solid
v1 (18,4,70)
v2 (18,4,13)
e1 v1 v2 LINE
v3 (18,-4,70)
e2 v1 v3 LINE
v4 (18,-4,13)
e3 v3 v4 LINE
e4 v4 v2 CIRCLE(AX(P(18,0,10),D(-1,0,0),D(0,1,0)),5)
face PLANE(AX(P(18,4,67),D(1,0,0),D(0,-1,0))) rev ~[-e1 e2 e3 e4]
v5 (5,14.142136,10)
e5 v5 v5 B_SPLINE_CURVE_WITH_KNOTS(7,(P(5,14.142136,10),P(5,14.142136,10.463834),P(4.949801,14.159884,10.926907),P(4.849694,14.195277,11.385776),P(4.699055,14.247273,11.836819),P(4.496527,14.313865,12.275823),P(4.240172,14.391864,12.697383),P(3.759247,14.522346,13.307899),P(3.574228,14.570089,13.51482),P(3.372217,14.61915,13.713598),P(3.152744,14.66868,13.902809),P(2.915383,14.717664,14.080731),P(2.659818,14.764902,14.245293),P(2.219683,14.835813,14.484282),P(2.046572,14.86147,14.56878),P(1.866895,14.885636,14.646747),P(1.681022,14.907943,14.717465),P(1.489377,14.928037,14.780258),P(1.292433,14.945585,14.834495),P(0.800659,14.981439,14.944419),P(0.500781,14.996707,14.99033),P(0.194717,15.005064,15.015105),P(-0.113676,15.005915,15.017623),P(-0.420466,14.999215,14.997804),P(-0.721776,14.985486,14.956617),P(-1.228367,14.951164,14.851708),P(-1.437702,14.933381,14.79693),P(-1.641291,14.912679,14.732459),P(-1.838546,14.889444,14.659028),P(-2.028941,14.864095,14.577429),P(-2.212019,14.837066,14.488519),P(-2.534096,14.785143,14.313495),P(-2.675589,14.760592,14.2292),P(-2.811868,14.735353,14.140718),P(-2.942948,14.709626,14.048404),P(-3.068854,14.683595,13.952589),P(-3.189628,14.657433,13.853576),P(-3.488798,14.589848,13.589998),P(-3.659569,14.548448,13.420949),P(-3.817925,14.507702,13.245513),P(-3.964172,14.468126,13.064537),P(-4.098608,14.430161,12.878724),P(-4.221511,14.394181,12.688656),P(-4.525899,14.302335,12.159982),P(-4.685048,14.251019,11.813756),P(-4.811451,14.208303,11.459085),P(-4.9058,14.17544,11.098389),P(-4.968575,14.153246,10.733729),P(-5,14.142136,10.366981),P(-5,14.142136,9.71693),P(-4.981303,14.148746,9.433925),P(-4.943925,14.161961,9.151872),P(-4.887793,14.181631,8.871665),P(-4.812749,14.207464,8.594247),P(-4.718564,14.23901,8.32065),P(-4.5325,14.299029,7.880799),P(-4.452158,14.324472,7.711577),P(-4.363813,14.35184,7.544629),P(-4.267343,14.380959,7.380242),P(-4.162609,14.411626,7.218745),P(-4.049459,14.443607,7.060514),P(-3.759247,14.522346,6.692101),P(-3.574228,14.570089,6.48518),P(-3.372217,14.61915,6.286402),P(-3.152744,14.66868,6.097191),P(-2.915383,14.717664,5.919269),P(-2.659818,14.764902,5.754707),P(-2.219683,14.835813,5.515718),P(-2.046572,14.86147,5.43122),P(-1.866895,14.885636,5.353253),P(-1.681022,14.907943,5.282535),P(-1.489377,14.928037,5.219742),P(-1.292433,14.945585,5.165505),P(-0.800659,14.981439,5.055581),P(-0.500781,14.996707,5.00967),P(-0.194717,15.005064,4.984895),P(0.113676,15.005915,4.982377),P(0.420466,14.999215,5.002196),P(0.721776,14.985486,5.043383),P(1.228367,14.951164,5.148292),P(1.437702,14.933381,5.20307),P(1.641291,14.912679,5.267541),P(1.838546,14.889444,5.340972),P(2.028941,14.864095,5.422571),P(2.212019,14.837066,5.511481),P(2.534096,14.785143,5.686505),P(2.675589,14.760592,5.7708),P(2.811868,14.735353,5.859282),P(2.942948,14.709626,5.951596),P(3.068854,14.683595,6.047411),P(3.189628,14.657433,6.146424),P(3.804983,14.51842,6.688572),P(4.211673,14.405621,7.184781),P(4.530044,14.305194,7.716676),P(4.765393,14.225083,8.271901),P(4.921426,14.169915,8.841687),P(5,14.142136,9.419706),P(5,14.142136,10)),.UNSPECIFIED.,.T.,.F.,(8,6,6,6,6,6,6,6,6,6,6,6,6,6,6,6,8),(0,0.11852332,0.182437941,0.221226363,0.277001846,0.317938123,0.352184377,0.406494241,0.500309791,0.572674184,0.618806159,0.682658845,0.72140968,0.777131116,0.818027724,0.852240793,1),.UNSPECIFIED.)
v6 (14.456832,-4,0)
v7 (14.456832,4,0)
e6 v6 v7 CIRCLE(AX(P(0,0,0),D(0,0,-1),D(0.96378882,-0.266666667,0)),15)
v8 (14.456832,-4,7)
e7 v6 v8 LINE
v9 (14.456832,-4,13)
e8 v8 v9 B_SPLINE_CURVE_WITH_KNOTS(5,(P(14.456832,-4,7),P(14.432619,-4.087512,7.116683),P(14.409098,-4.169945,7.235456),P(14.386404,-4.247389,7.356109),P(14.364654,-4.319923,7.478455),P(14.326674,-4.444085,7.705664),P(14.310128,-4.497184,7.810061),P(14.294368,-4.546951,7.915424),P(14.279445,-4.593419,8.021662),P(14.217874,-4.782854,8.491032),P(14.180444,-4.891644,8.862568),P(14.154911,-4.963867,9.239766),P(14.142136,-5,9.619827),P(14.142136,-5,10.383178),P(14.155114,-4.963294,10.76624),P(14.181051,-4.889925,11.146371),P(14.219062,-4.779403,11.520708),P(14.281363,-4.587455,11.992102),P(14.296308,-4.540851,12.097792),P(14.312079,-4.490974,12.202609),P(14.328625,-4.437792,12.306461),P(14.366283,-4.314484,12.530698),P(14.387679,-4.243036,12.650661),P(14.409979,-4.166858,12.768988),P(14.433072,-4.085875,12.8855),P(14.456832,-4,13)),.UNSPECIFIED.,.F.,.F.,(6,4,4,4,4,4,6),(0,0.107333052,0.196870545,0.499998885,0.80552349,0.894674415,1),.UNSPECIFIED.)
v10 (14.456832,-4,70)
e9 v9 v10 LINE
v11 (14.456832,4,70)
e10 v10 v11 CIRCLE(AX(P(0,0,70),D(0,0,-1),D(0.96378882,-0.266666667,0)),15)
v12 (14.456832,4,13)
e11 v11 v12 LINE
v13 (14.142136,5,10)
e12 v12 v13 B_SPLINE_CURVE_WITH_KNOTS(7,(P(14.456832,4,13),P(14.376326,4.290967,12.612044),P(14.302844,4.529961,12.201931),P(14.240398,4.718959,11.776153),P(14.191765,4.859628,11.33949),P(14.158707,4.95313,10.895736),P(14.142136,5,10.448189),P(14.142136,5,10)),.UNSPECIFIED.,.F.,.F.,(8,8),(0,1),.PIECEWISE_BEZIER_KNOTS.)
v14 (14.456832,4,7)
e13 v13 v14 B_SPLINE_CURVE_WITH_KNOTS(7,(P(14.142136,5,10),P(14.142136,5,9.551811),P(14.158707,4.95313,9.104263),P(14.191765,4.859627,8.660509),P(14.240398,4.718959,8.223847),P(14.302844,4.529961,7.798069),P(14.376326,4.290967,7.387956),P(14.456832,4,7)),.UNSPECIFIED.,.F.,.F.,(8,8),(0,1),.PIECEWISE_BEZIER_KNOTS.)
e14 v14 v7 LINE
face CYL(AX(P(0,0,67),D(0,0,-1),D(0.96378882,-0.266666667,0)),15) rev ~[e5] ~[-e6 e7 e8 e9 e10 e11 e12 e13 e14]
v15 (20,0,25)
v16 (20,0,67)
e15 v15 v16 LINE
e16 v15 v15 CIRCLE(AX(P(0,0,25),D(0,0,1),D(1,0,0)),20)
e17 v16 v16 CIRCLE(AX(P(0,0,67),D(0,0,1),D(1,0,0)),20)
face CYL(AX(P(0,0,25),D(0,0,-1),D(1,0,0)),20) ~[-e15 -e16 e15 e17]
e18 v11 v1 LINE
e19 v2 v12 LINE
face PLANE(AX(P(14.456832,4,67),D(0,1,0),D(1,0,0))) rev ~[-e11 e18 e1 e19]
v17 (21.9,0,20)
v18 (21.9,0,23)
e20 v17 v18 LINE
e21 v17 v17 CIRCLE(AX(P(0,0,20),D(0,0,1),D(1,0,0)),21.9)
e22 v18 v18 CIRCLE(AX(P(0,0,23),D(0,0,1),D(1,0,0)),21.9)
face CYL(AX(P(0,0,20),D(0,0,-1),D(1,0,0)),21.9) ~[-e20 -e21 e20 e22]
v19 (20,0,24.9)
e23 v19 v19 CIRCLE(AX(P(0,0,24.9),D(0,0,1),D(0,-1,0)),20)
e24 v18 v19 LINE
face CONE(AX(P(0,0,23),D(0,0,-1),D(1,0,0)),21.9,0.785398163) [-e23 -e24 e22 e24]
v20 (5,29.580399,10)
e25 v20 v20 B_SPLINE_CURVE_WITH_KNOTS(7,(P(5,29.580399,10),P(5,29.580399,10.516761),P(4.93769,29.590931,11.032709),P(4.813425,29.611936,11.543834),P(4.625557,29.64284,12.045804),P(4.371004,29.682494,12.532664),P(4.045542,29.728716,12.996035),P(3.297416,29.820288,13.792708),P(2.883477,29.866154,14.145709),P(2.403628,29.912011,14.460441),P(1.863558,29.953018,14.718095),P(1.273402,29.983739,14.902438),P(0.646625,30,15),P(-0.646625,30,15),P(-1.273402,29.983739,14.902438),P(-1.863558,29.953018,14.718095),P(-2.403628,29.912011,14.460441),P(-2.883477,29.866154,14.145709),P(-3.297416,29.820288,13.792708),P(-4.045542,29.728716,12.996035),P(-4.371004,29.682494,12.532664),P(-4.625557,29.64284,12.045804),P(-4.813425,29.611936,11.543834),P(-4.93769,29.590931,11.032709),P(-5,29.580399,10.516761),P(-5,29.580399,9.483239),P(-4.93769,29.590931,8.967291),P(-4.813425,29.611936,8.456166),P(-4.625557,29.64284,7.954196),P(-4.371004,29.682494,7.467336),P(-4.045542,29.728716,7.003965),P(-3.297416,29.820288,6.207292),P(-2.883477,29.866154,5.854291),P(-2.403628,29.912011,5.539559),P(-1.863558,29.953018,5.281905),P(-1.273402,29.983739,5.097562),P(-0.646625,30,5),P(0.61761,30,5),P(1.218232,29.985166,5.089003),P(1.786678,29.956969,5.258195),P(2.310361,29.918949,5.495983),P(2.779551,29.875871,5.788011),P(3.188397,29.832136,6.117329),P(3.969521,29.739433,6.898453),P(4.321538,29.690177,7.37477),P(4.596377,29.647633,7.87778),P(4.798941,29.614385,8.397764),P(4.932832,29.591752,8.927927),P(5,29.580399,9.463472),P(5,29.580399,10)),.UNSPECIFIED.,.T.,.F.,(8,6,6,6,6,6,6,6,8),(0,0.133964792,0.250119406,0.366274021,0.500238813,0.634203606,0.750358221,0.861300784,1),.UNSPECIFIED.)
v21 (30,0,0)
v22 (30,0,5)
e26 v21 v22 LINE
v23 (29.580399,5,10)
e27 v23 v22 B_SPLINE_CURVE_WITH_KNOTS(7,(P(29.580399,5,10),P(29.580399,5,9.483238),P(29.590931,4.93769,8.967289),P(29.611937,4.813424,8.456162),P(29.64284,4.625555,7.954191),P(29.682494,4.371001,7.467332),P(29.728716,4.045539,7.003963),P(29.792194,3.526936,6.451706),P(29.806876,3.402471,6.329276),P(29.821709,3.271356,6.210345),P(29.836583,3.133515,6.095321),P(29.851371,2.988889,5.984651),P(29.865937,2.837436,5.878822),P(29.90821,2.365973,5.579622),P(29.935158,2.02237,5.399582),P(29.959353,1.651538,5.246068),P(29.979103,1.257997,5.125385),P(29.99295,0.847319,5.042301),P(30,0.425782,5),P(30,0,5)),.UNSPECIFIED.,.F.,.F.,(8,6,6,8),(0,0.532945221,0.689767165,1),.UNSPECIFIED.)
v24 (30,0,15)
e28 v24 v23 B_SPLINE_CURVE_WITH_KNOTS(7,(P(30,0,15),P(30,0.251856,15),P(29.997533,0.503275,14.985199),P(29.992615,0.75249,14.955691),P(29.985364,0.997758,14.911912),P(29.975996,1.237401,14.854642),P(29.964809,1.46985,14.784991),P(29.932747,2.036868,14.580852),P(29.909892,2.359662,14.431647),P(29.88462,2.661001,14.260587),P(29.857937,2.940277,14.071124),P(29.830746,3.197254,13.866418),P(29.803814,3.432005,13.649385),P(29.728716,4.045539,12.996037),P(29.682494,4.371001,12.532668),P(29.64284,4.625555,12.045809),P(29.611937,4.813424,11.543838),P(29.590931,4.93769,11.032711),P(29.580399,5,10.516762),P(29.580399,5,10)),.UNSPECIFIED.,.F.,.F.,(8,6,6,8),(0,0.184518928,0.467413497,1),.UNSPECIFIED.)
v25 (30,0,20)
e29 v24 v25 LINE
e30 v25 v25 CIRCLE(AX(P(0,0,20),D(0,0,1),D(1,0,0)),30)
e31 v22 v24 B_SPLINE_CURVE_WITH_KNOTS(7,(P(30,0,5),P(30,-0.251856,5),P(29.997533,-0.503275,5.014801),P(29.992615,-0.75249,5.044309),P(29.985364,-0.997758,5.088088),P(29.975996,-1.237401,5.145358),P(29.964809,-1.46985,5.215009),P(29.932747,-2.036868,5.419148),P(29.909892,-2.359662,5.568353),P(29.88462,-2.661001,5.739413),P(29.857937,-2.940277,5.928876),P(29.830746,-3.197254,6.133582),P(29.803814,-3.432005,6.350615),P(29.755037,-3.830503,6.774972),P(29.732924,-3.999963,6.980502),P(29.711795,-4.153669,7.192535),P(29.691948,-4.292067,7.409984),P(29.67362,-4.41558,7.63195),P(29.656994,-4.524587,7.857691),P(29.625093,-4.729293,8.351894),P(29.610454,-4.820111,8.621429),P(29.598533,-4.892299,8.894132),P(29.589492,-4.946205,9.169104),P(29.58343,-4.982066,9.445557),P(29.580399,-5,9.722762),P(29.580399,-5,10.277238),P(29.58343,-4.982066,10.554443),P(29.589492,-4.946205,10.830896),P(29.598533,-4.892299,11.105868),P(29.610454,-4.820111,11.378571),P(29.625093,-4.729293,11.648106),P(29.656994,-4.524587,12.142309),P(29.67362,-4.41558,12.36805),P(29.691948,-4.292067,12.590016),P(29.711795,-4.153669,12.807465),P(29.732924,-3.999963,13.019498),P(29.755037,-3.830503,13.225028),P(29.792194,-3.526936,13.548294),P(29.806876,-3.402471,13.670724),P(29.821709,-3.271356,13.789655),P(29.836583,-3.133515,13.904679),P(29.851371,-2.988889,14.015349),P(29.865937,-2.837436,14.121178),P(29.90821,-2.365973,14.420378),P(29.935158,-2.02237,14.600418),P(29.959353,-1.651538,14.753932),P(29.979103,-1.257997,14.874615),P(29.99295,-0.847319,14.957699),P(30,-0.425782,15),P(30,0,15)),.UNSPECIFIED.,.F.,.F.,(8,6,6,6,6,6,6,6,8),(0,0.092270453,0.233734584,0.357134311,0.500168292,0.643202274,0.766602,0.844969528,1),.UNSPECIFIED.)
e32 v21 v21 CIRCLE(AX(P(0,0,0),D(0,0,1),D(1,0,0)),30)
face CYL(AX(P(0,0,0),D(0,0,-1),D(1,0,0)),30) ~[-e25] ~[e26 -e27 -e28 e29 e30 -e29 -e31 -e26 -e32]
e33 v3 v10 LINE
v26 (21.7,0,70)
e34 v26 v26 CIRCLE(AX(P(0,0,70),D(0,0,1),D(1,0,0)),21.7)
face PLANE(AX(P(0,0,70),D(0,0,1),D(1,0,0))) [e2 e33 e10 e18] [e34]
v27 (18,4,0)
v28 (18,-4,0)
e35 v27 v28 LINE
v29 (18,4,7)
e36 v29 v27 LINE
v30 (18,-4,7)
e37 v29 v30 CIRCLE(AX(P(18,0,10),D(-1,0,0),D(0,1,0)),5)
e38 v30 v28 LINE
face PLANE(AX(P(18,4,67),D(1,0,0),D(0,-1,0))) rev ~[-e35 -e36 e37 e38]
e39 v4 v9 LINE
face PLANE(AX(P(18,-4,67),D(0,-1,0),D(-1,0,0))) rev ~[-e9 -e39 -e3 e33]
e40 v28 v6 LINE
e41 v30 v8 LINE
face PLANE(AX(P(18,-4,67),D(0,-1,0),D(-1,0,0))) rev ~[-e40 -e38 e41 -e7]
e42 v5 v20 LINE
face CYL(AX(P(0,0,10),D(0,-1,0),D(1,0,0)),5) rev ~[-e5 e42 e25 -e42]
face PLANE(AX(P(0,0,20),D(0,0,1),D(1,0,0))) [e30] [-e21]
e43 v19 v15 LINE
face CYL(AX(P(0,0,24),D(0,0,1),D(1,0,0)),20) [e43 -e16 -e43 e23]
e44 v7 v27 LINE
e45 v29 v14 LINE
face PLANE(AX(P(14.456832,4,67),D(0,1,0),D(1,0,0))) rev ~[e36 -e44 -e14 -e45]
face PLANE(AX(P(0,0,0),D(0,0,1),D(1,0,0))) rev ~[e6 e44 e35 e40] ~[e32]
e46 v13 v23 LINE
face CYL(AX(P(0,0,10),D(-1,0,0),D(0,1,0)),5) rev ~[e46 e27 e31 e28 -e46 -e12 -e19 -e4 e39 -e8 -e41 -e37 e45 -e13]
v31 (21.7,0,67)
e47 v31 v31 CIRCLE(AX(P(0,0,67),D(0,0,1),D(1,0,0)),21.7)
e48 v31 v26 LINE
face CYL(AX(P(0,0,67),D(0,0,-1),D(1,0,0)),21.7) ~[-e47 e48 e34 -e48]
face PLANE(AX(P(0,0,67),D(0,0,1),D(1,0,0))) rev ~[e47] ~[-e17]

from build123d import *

# Parameters (mm, degrees)
F0_R         = 30
F1_DEPTH     = 20
F2_R         = 21.9
F3_DEPTH     = 5
F4_R         = 20
F5_DEPTH     = 42
F6_R         = 21.7
F6_R_2       = 20
F7_DEPTH     = 3
F9_D         = 10
F9_DEPTH     = 80
F9_TIP       = 3.0043030951
F11_D        = 10
F11_DEPTH    = 50
F11_TIP      = 3.0043030951
F12_S5_R     = 20
F12_T6_DEPTH = 32


# Not quite as in the source:
# - a fillet or chamfer that OpenCascade refuses, or shapes differently, is made with other operations: its cross-section is extruded or revolved along the edge and cut away or added


with BuildPart() as f1:
    # F0 (on Top) → F1 (new body)
    with BuildSketch(Plane.XY):
        Circle(F0_R)
        with BuildLine():
            ThreePointArc((14.4568322948, -4), (-15, 0), (14.4568322948, 4))
            Line((14.4568322948, 4), (18, 4))
            Line((18, 4), (18, 0))
            Line((18, 0), (18, -4))
            Line((18, -4), (14.4568322948, -4))
        make_face(mode=Mode.SUBTRACT)
    extrude(amount=F1_DEPTH)

    # F2 (on face) → F3 (join)
    with BuildSketch(Plane.XY.offset(20)):
        Circle(F2_R)
        with BuildLine():
            ThreePointArc((14.4568322948, -4), (-15, 0), (14.4568322948, 4))
            Line((14.4568322948, 4), (18, 4))
            Line((18, 4), (18, -4))
            Line((18, -4), (14.4568322948, -4))
        make_face(mode=Mode.SUBTRACT)
    extrude(amount=F3_DEPTH)

    # F4 (on face) → F5 (join)
    with BuildSketch(Plane.XY.offset(25)):
        Circle(F4_R)
        with BuildLine():
            ThreePointArc((14.4568322948, -4), (-15, 0), (14.4568322948, 4))
            Line((14.4568322948, 4), (18, 4))
            Line((18, 4), (18, -4))
            Line((18, -4), (14.4568322948, -4))
        make_face(mode=Mode.SUBTRACT)
    extrude(amount=F5_DEPTH)

    # F6 (on face) → F7 (join)
    with BuildSketch(Plane.XY.offset(67)):
        Circle(F6_R)
        Circle(F6_R_2, mode=Mode.SUBTRACT)
        Circle(F6_R_2)
        with BuildLine():
            ThreePointArc((14.4568322948, -4), (-15, 0), (14.4568322948, 4))
            Line((14.4568322948, 4), (18, 4))
            Line((18, 4), (18, -4))
            Line((18, -4), (14.4568322948, -4))
        make_face(mode=Mode.SUBTRACT)
    extrude(amount=F7_DEPTH)

    # F9 (one way)
    with BuildSketch(Plane(origin=(0, 0, 0), x_dir=(0, 1, 0), z_dir=(-1, 0, 0))):
        with Locations((0, -10)):
            Circle(F9_D / 2)
    extrude(amount=-F9_DEPTH, mode=Mode.SUBTRACT)
    with Locations(Plane(origin=(0, 0, 0), x_dir=(0, 1, 0), z_dir=(-1, 0, 0))):
        with Locations((0, -10)):
            with Locations((0, 0, -(F9_DEPTH + F9_TIP / 2))):  # 118° drill point
                Cone(0, F9_D / 2, F9_TIP, mode=Mode.SUBTRACT)

    # F11 (one way)
    with BuildSketch(Plane.XZ):
        with Locations((0, 10)):
            Circle(F11_D / 2)
    extrude(amount=-F11_DEPTH, mode=Mode.SUBTRACT)
    with Locations(Plane.XZ):
        with Locations((0, 10)):
            with Locations((0, 0, -(F11_DEPTH + F11_TIP / 2))):  # 118° drill point
                Cone(0, F11_D / 2, F11_TIP, mode=Mode.SUBTRACT)

    # F12: chamfer of 2 on 1 edges, made by hand


with BuildPart() as f12_tool2:
    # F12_s3 → F12_t4 (revolve)
    with BuildSketch(Plane.XZ):
        Polygon((21.9, 23), (19.9, 25), (21.9, 25), align=None)
    revolve(axis=Axis((0, 0, 25), (0, 0, 1)))

    # F12_s5 → F12_t6 (cut, symmetric)
    with BuildSketch(Plane.XY.offset(24)):
        Circle(F12_S5_R)
    extrude(amount=F12_T6_DEPTH, both=True, mode=Mode.SUBTRACT)


with BuildPart() as f1_1:
    add(f1.part)

    # F12_t1: cut F12_tool2
    add(f12_tool2.part, mode=Mode.SUBTRACT)


solid = f1_1.part
